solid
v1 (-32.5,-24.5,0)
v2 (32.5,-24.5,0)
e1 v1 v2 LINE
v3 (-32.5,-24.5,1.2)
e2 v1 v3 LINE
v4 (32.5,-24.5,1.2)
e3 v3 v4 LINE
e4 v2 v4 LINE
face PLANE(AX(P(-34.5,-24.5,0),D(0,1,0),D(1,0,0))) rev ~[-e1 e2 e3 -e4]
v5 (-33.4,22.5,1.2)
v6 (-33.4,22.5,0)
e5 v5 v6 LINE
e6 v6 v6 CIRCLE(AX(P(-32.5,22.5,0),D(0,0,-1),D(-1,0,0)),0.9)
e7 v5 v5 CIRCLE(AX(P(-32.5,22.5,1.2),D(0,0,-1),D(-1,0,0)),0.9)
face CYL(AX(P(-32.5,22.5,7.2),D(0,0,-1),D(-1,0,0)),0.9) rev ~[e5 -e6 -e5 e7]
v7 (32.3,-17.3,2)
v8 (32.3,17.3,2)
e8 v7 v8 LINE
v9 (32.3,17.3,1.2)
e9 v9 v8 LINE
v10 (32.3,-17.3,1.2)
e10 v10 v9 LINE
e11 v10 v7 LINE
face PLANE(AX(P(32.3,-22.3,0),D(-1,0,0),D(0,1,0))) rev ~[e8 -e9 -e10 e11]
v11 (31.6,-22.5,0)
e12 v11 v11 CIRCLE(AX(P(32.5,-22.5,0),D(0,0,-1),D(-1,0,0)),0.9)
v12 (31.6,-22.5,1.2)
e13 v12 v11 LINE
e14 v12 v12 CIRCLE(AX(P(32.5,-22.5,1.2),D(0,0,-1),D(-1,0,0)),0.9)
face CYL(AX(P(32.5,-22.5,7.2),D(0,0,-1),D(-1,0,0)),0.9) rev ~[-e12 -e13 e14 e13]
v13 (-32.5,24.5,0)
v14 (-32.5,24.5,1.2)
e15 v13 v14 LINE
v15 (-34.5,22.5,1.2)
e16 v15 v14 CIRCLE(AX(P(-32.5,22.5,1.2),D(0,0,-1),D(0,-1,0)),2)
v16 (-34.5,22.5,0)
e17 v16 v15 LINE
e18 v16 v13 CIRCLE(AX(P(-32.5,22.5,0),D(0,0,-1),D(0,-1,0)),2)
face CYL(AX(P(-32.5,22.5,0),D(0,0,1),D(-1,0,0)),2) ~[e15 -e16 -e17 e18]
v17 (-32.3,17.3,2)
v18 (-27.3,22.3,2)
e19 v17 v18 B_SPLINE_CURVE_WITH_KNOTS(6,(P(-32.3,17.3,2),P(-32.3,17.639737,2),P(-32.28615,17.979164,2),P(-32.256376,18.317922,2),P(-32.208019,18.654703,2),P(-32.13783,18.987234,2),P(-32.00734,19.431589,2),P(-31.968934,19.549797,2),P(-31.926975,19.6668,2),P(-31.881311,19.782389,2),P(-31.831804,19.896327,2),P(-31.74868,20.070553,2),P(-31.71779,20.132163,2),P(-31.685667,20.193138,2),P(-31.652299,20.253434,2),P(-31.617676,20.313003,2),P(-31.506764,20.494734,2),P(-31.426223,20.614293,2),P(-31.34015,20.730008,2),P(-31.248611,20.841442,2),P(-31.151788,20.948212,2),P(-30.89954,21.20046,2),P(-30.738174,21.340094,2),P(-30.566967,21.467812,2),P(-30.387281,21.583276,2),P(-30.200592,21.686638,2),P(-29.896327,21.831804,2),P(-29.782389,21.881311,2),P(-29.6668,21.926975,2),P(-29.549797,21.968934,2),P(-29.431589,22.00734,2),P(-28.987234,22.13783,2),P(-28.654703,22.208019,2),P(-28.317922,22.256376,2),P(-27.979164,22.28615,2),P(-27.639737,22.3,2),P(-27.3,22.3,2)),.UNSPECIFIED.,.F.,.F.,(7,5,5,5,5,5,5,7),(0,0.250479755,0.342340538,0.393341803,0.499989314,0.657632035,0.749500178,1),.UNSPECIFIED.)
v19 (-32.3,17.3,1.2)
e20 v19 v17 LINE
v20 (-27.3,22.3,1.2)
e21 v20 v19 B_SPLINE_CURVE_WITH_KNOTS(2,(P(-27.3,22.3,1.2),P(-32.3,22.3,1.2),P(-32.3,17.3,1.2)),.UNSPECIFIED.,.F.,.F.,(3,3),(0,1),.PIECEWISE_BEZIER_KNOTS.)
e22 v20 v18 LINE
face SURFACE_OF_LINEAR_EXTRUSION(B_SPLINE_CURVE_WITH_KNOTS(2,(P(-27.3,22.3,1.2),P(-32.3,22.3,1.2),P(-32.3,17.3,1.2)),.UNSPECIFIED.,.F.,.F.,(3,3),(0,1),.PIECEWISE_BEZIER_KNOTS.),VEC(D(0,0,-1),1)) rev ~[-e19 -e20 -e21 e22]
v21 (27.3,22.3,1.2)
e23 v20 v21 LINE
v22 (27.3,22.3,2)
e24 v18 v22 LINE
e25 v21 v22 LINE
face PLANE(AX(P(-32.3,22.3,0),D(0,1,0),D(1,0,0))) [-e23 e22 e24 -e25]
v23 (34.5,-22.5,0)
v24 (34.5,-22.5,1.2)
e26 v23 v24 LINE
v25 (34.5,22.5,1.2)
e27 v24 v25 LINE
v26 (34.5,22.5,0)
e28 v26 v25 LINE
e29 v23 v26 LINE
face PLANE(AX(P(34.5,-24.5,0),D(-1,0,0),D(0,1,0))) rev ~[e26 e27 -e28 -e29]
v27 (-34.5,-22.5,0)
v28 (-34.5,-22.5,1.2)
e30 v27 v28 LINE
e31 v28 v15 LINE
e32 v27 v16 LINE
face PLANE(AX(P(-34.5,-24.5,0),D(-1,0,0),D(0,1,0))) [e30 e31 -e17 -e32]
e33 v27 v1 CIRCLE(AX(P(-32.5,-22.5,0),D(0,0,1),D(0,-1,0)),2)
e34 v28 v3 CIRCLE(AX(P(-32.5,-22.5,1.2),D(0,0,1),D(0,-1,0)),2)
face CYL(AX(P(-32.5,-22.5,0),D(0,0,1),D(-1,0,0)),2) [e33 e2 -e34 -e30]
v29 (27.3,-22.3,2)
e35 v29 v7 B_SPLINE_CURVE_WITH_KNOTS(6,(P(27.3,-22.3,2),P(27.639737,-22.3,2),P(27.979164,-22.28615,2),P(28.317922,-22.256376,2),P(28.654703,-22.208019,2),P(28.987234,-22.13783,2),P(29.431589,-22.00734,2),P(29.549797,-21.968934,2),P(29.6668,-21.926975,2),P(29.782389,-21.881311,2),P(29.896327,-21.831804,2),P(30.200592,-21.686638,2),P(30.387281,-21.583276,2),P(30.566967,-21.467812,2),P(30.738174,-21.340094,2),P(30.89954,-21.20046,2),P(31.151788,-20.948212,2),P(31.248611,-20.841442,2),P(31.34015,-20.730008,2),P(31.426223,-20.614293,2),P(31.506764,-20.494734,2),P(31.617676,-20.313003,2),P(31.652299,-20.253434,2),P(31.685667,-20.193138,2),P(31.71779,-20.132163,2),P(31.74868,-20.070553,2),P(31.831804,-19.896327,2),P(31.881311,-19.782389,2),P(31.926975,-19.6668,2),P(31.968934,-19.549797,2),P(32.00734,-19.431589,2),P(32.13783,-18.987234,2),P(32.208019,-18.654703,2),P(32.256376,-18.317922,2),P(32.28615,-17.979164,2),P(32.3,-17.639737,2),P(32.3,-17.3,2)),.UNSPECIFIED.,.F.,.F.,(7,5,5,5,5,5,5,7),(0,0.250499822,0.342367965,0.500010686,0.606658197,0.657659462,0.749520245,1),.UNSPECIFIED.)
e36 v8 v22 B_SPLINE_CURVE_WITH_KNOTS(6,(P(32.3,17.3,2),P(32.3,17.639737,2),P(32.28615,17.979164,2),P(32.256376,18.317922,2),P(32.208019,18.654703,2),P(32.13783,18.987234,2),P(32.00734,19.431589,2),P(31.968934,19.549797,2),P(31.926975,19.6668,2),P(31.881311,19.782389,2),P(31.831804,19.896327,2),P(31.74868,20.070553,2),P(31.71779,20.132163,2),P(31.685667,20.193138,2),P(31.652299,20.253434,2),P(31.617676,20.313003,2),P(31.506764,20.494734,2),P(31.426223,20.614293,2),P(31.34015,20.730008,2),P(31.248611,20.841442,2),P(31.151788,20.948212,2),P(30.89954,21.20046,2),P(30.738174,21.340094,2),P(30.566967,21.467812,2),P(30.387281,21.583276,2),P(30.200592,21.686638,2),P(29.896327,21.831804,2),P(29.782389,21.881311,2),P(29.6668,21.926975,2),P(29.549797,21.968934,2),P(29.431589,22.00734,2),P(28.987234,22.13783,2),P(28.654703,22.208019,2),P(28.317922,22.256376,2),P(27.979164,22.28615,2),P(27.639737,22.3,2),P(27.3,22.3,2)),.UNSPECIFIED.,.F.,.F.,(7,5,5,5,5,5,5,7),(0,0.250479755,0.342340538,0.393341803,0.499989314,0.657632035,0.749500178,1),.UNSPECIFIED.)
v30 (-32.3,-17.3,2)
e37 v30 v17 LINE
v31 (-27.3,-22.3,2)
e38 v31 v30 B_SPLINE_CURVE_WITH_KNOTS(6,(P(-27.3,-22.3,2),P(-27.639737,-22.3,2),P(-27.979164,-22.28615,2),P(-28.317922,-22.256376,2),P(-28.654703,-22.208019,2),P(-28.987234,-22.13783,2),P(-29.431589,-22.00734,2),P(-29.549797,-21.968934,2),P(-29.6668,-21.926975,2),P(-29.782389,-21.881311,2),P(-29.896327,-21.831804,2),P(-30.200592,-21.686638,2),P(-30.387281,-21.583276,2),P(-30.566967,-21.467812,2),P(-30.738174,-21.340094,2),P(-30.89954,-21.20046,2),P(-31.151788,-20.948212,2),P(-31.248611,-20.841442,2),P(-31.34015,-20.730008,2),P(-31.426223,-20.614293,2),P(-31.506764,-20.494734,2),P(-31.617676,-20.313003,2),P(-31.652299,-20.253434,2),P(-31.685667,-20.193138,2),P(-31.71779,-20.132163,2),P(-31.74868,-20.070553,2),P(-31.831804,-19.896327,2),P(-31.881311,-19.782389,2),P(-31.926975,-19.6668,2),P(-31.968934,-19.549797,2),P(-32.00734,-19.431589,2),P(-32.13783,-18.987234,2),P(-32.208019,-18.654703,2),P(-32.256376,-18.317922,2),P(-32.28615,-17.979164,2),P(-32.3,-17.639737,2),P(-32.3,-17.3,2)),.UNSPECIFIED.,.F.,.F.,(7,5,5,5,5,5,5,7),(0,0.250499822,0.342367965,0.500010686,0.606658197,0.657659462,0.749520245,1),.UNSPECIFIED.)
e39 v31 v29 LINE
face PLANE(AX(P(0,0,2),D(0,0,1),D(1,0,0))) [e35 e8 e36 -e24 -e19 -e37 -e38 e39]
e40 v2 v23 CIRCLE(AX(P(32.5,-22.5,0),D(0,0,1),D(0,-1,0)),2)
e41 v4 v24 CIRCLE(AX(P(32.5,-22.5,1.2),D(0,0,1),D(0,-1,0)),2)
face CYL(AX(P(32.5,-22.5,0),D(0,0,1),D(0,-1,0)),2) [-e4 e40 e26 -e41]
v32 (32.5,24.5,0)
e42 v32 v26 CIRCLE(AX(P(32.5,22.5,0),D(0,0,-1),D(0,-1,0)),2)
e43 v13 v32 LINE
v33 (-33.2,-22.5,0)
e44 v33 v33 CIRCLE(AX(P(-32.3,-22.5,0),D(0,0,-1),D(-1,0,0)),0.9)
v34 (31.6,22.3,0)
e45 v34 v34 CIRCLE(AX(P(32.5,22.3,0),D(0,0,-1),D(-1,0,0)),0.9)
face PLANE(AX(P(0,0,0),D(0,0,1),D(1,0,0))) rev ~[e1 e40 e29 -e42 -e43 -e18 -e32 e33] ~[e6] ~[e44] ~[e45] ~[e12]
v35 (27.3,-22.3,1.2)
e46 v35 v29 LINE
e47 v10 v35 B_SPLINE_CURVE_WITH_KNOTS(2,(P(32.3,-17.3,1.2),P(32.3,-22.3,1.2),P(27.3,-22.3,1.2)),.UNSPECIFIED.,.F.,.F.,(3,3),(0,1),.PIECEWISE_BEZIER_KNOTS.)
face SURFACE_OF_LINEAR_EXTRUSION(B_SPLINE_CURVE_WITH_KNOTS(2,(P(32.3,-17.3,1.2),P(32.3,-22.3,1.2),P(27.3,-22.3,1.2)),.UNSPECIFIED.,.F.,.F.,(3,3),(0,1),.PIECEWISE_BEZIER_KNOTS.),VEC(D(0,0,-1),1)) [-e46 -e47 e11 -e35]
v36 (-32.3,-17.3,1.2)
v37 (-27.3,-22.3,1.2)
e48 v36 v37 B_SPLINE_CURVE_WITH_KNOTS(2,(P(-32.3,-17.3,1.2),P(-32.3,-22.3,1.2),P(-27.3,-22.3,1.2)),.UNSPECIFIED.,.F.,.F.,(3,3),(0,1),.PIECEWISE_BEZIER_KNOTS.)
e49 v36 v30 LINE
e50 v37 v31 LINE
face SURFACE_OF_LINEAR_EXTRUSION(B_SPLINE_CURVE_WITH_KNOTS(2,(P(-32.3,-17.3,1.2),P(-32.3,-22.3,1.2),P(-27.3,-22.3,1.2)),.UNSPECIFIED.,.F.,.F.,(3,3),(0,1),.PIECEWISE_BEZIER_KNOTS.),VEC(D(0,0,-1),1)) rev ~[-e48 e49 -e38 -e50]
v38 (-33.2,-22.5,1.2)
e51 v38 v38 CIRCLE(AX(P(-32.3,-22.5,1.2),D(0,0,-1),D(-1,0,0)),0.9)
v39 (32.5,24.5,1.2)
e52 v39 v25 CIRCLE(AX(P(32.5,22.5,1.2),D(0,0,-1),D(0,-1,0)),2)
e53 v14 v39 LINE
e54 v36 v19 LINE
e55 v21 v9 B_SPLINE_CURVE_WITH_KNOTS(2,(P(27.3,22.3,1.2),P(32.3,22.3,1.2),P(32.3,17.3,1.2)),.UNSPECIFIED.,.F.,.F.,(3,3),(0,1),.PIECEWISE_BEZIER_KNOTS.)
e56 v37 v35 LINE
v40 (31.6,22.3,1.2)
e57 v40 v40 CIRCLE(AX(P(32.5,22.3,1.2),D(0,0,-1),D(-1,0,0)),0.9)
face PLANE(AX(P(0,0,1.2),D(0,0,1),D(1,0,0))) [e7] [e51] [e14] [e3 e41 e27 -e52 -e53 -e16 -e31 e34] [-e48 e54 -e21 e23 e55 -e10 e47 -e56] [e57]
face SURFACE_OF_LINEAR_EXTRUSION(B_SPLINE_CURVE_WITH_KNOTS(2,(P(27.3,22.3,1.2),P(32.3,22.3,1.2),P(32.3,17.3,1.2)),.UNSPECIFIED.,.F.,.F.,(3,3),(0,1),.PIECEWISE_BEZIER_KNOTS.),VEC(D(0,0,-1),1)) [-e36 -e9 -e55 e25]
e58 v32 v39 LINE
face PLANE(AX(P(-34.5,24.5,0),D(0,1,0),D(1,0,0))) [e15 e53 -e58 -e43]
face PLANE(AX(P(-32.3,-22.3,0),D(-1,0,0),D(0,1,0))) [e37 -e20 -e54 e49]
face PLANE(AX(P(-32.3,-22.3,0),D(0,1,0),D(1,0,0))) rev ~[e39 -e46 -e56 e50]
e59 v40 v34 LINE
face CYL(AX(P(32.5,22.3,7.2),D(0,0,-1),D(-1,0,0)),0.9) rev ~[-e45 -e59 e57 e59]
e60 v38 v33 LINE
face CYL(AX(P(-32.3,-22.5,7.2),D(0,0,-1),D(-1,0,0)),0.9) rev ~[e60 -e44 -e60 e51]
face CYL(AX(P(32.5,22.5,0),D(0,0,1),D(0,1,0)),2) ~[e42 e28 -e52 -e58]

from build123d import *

# Parameters (mm, degrees)
F0_W        = 64.6
F0_H        = 44.6
F1_DEPTH    = 2
F0_W_2      = 69
F0_H_2      = 49
F2_DEPTH    = 1.2
F3_T1_DEPTH = 13.3
F4_R        = 2
F6_D        = 1.8
F6_DEPTH    = 6
F6_TIP      = 0.5407745571


# Not quite as in the source:
# - a fillet or chamfer that OpenCascade refuses, or shapes differently, is made with other operations: its cross-section is extruded or revolved along the edge and cut away or added
# - the program builds the solid bodies; features that only make, move or delete a surface that nothing else refers to are left out


with BuildPart() as f1:
    # F0 (on Top) → F1 (new body)
    with BuildSketch(Plane.XY):
        Rectangle(F0_W, F0_H)
    extrude(amount=F1_DEPTH)

    # F0 (on Top) → F2 (join)
    with BuildSketch(Plane.XY):
        Rectangle(F0_W_2, F0_H_2)
        Rectangle(F0_W, F0_H, mode=Mode.SUBTRACT)
    extrude(amount=F2_DEPTH)

    # F3: fillet of radius 5 on 4 edges, made by hand

    # F3_s2 → F3_t1 (cut)
    with BuildSketch(Plane.XY.offset(1.2)):
        with BuildLine():
            add(Edge.make_bspline(
                [(-32.3, -17.3), (-32.3, -22.3), (-27.3, -22.3)],
                knots=[0, 0, 0, 1, 1, 1], degree=2, weights=[1, 1, 1]))
            Line((-27.3, -22.3), (-32.3, -22.3))
            Line((-32.3, -22.3), (-32.3, -17.3))
        make_face()
        with BuildLine():
            add(Edge.make_bspline(
                [(32.3, -17.3), (32.3, -22.3), (27.3, -22.3)],
                knots=[0, 0, 0, 1, 1, 1], degree=2, weights=[1, 1, 1]))
            Line((27.3, -22.3), (32.3, -22.3))
            Line((32.3, -22.3), (32.3, -17.3))
        make_face()
        with BuildLine():
            add(Edge.make_bspline(
                [(27.3, 22.3), (32.3, 22.3), (32.3, 17.3)],
                knots=[0, 0, 0, 1, 1, 1], degree=2, weights=[1, 1, 1]))
            Line((32.3, 17.3), (32.3, 22.3))
            Line((32.3, 22.3), (27.3, 22.3))
        make_face()
        with BuildLine():
            add(Edge.make_bspline(
                [(-27.3, 22.3), (-32.3, 22.3), (-32.3, 17.3)],
                knots=[0, 0, 0, 1, 1, 1], degree=2, weights=[1, 1, 1]))
            Line((-32.3, 17.3), (-32.3, 22.3))
            Line((-32.3, 22.3), (-27.3, 22.3))
        make_face()
    extrude(amount=F3_T1_DEPTH, mode=Mode.SUBTRACT)

    # F4
    f4_edges = [f1.edges().sort_by_distance(p)[0] for p in [
        (-34.5, 24.5, 0.6),
        (-34.5, -24.5, 0.6),
        (34.5, 24.5, 0.6),
        (34.5, -24.5, 0.6),
    ]]
    fillet(f4_edges, radius=F4_R)

    # F6
    with Locations(Plane.XY.offset(1.2)):
        with Locations((-32.3, -22.5), (-32.5, 22.5), (32.5, -22.5), (32.5, 22.3)):
            Hole(F6_D / 2, depth=F6_DEPTH)
            with Locations((0, 0, -(F6_DEPTH + F6_TIP / 2))):  # 118° drill point
                Cone(0, F6_D / 2, F6_TIP, mode=Mode.SUBTRACT)


solid = f1.part
